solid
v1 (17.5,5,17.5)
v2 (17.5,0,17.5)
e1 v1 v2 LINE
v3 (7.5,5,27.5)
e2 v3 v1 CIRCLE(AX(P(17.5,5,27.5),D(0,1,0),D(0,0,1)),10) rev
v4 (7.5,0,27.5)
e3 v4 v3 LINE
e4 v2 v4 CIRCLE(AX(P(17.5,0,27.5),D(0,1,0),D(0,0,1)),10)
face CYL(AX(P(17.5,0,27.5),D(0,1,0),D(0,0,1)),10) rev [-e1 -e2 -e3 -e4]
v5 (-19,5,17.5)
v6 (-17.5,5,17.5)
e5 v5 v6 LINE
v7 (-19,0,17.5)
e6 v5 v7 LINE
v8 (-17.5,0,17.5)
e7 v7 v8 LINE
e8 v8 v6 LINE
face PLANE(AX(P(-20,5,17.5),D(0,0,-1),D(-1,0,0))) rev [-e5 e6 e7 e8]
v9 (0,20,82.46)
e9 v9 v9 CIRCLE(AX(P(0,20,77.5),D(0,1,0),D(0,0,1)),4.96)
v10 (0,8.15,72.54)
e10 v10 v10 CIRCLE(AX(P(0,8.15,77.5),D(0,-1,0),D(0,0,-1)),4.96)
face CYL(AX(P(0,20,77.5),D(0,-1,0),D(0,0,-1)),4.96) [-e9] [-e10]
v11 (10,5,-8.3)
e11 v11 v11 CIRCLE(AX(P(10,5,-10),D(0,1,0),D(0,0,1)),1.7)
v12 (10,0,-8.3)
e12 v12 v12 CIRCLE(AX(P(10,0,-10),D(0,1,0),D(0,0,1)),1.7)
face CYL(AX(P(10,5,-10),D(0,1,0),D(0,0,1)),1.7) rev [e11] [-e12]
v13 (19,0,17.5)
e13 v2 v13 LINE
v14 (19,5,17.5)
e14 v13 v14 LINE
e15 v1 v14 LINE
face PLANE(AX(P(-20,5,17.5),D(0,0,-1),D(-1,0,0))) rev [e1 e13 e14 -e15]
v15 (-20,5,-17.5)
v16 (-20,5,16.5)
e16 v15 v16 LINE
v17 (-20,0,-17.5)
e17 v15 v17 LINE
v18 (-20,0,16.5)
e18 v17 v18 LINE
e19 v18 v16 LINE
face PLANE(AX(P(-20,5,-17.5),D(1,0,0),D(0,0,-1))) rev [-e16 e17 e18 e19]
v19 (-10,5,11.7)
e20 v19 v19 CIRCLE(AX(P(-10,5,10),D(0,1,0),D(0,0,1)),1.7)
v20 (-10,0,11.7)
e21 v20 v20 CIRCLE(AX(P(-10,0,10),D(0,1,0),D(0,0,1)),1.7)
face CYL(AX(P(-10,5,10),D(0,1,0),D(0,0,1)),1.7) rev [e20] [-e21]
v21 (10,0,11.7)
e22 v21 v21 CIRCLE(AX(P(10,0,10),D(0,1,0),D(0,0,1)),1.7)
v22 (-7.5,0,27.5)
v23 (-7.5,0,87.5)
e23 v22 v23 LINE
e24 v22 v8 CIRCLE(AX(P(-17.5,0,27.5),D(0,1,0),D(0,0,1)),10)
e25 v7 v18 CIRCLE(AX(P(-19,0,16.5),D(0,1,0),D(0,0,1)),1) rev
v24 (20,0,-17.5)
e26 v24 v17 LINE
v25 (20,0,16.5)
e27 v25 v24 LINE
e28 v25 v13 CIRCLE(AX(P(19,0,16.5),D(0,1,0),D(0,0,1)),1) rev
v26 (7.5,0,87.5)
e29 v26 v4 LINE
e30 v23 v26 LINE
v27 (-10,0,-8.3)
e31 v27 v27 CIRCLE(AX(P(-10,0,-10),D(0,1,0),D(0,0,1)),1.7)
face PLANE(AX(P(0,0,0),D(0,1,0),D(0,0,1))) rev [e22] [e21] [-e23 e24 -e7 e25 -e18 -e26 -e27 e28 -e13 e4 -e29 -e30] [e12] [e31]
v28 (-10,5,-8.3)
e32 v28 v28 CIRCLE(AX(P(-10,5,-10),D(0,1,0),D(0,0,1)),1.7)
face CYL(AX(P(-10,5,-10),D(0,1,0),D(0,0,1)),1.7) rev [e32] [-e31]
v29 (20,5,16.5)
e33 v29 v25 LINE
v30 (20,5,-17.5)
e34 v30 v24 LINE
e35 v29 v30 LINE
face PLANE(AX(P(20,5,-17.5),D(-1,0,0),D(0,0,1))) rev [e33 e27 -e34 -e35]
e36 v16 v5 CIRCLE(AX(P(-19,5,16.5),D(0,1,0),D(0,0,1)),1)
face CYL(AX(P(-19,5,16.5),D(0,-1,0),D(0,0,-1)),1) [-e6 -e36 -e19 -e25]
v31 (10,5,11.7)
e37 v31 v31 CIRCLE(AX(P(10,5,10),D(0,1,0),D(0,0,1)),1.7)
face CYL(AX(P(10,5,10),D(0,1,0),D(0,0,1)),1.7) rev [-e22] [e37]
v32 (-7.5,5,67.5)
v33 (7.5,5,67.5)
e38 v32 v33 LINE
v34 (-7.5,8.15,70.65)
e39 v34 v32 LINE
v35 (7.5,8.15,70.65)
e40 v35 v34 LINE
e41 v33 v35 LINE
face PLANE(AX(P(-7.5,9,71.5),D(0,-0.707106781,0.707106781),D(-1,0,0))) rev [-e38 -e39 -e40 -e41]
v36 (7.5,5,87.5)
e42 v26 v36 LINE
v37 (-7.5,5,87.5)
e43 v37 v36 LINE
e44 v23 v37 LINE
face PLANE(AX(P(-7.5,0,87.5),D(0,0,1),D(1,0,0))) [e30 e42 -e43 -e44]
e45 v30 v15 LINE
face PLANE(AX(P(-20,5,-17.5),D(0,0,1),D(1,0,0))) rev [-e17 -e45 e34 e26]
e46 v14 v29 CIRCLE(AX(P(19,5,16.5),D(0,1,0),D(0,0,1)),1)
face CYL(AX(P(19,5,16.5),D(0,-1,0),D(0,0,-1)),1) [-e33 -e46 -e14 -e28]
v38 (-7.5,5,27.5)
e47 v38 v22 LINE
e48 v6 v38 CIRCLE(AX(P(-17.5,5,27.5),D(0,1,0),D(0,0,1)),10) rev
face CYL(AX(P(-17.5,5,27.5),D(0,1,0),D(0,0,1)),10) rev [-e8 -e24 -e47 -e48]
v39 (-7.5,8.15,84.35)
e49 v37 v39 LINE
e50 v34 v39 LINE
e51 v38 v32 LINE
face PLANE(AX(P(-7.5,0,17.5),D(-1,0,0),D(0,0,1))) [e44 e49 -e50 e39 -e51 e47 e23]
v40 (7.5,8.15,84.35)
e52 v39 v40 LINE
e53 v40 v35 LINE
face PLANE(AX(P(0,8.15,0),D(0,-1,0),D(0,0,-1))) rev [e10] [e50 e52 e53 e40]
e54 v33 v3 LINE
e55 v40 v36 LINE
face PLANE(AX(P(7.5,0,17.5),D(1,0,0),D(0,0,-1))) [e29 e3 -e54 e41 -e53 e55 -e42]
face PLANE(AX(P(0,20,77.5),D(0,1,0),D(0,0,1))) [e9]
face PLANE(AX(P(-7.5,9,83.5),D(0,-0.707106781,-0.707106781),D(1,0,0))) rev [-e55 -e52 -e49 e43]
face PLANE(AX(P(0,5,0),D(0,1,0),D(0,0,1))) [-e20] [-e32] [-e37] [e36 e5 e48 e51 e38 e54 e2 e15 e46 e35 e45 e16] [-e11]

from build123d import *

# Parameters (mm, degrees)
SKETCH1_W                    = 40
SKETCH1_H                    = 35
BOSS_EXTRUDE1_DEPTH          = 5
M3_CLEARANCE_HOLE1_OUTLINE_R = 1.7
M3_CLEARANCE_HOLE1_DEPTH     = 5
SKETCH7_W                    = 15
SKETCH7_H                    = 70
BOSS_EXTRUDE3_DEPTH          = 5
SKETCH8_R                    = 4.96
BOSS_EXTRUDE4_DEPTH          = 15
SKETCH9_W                    = 15
SKETCH9_H                    = 12
BOSS_EXTRUDE5_DEPTH          = 3.15
FILLET1_R                    = 10
FILLET2_R                    = 1
CHAMFER1_SIZE                = 4


# Read off the part's stored shape, not the designer's step: M3 Clearance Hole1
with BuildPart() as part:
    # Sketch1 → Boss-Extrude1 (new body)
    with BuildSketch(Plane(origin=(0, 0, 0), x_dir=(1, 0, 0), z_dir=(0, 1, 0))):
        Rectangle(SKETCH1_W, SKETCH1_H)
    extrude(amount=BOSS_EXTRUDE1_DEPTH)

    # M3 Clearance Hole1 outline → M3 Clearance Hole1 (cut)
    with BuildSketch(Plane(origin=(0, 0, 0), x_dir=(1, 0, 0), z_dir=(0, 1, 0))):
        with Locations((10, 10)):
            Circle(M3_CLEARANCE_HOLE1_OUTLINE_R)
        with Locations((-10, -10)):
            Circle(M3_CLEARANCE_HOLE1_OUTLINE_R)
        with Locations((-10, 10)):
            Circle(M3_CLEARANCE_HOLE1_OUTLINE_R)
        with Locations((10, -10)):
            Circle(M3_CLEARANCE_HOLE1_OUTLINE_R)
    extrude(amount=M3_CLEARANCE_HOLE1_DEPTH, mode=Mode.SUBTRACT)

    # Sketch7 → Boss-Extrude3 (add, through all)
    with BuildSketch(Plane(origin=(0, 5, 0), x_dir=(1, 0, 0), z_dir=(0, 1, 0))):
        with Locations((0, -52.5)):
            Rectangle(SKETCH7_W, SKETCH7_H)
    extrude(amount=-BOSS_EXTRUDE3_DEPTH)

    # Sketch8 → Boss-Extrude4 (add)
    with BuildSketch(Plane(origin=(0, 5, 0), x_dir=(1, 0, 0), z_dir=(0, 1, 0))):
        with Locations(Location((0, -77.5, 0), (0, 0, 270))):
            Circle(SKETCH8_R)
    extrude(amount=BOSS_EXTRUDE4_DEPTH)

    # Sketch9 → Boss-Extrude5 (add)
    with BuildSketch(Plane(origin=(0, 5, 0), x_dir=(1, 0, 0), z_dir=(0, 1, 0))):
        with Locations((0, -77.5)):
            Rectangle(SKETCH9_W, SKETCH9_H)
    extrude(amount=BOSS_EXTRUDE5_DEPTH)

    # Fillet1
    fillet1_edges = [part.edges().sort_by_distance(p)[0] for p in [
        (-7.5, 2.5, 17.5),
        (7.5, 2.5, 17.5),
    ]]
    fillet(fillet1_edges, radius=FILLET1_R)

    # Fillet2
    fillet2_edges = [part.edges().sort_by_distance(p)[0] for p in [
        (20, 2.5, 17.5),
        (-20, 2.5, 17.5),
    ]]
    fillet(fillet2_edges, radius=FILLET2_R)

    # Chamfer1
    # the kernel refuses this chamfer: 4 mm, written as the material it adds along each edge
    with BuildSketch(Plane(origin=(7.5, 5, 71.5), x_dir=(0, -0.027495876610586296, -0.9996219169112968), z_dir=(-1, 0, 0))) as chamfer1_piece_1_section:
        Polygon((CHAMFER1_SIZE * 0.999621916911, -CHAMFER1_SIZE * 0.0274958766106), (-CHAMFER1_SIZE * 0.0274958766106, -CHAMFER1_SIZE * 0.999621916911), (0, 0), align=None)
    chamfer1_piece_1 = extrude(amount=15, mode=Mode.PRIVATE)
    chamfer1_piece_1 = split(chamfer1_piece_1, bisect_by=Plane(origin=(0, 8.15, 70.111191503), z_dir=(0, -1, 0)), keep=Keep.TOP, mode=Mode.PRIVATE)
    add(chamfer1_piece_1)
    with BuildSketch(Plane(origin=(-7.5, 5, 83.5), x_dir=(0, -0.027495876610586296, 0.9996219169112968), z_dir=(1, 0, 0))) as chamfer1_piece_2_section:
        Polygon((CHAMFER1_SIZE * 0.999621916911, -CHAMFER1_SIZE * 0.0274958766106), (-CHAMFER1_SIZE * 0.0274958766106, -CHAMFER1_SIZE * 0.999621916911), (0, 0), align=None)
    chamfer1_piece_2 = extrude(amount=15, mode=Mode.PRIVATE)
    chamfer1_piece_2 = split(chamfer1_piece_2, bisect_by=Plane(origin=(0, 6.188699504, 87.5), z_dir=(0, 0, -1)), keep=Keep.TOP, mode=Mode.PRIVATE)
    chamfer1_piece_2 = split(chamfer1_piece_2, bisect_by=Plane(origin=(0, 8.15, 84.884013224), z_dir=(0, -1, 0)), keep=Keep.TOP, mode=Mode.PRIVATE)
    add(chamfer1_piece_2)


solid = part.part
